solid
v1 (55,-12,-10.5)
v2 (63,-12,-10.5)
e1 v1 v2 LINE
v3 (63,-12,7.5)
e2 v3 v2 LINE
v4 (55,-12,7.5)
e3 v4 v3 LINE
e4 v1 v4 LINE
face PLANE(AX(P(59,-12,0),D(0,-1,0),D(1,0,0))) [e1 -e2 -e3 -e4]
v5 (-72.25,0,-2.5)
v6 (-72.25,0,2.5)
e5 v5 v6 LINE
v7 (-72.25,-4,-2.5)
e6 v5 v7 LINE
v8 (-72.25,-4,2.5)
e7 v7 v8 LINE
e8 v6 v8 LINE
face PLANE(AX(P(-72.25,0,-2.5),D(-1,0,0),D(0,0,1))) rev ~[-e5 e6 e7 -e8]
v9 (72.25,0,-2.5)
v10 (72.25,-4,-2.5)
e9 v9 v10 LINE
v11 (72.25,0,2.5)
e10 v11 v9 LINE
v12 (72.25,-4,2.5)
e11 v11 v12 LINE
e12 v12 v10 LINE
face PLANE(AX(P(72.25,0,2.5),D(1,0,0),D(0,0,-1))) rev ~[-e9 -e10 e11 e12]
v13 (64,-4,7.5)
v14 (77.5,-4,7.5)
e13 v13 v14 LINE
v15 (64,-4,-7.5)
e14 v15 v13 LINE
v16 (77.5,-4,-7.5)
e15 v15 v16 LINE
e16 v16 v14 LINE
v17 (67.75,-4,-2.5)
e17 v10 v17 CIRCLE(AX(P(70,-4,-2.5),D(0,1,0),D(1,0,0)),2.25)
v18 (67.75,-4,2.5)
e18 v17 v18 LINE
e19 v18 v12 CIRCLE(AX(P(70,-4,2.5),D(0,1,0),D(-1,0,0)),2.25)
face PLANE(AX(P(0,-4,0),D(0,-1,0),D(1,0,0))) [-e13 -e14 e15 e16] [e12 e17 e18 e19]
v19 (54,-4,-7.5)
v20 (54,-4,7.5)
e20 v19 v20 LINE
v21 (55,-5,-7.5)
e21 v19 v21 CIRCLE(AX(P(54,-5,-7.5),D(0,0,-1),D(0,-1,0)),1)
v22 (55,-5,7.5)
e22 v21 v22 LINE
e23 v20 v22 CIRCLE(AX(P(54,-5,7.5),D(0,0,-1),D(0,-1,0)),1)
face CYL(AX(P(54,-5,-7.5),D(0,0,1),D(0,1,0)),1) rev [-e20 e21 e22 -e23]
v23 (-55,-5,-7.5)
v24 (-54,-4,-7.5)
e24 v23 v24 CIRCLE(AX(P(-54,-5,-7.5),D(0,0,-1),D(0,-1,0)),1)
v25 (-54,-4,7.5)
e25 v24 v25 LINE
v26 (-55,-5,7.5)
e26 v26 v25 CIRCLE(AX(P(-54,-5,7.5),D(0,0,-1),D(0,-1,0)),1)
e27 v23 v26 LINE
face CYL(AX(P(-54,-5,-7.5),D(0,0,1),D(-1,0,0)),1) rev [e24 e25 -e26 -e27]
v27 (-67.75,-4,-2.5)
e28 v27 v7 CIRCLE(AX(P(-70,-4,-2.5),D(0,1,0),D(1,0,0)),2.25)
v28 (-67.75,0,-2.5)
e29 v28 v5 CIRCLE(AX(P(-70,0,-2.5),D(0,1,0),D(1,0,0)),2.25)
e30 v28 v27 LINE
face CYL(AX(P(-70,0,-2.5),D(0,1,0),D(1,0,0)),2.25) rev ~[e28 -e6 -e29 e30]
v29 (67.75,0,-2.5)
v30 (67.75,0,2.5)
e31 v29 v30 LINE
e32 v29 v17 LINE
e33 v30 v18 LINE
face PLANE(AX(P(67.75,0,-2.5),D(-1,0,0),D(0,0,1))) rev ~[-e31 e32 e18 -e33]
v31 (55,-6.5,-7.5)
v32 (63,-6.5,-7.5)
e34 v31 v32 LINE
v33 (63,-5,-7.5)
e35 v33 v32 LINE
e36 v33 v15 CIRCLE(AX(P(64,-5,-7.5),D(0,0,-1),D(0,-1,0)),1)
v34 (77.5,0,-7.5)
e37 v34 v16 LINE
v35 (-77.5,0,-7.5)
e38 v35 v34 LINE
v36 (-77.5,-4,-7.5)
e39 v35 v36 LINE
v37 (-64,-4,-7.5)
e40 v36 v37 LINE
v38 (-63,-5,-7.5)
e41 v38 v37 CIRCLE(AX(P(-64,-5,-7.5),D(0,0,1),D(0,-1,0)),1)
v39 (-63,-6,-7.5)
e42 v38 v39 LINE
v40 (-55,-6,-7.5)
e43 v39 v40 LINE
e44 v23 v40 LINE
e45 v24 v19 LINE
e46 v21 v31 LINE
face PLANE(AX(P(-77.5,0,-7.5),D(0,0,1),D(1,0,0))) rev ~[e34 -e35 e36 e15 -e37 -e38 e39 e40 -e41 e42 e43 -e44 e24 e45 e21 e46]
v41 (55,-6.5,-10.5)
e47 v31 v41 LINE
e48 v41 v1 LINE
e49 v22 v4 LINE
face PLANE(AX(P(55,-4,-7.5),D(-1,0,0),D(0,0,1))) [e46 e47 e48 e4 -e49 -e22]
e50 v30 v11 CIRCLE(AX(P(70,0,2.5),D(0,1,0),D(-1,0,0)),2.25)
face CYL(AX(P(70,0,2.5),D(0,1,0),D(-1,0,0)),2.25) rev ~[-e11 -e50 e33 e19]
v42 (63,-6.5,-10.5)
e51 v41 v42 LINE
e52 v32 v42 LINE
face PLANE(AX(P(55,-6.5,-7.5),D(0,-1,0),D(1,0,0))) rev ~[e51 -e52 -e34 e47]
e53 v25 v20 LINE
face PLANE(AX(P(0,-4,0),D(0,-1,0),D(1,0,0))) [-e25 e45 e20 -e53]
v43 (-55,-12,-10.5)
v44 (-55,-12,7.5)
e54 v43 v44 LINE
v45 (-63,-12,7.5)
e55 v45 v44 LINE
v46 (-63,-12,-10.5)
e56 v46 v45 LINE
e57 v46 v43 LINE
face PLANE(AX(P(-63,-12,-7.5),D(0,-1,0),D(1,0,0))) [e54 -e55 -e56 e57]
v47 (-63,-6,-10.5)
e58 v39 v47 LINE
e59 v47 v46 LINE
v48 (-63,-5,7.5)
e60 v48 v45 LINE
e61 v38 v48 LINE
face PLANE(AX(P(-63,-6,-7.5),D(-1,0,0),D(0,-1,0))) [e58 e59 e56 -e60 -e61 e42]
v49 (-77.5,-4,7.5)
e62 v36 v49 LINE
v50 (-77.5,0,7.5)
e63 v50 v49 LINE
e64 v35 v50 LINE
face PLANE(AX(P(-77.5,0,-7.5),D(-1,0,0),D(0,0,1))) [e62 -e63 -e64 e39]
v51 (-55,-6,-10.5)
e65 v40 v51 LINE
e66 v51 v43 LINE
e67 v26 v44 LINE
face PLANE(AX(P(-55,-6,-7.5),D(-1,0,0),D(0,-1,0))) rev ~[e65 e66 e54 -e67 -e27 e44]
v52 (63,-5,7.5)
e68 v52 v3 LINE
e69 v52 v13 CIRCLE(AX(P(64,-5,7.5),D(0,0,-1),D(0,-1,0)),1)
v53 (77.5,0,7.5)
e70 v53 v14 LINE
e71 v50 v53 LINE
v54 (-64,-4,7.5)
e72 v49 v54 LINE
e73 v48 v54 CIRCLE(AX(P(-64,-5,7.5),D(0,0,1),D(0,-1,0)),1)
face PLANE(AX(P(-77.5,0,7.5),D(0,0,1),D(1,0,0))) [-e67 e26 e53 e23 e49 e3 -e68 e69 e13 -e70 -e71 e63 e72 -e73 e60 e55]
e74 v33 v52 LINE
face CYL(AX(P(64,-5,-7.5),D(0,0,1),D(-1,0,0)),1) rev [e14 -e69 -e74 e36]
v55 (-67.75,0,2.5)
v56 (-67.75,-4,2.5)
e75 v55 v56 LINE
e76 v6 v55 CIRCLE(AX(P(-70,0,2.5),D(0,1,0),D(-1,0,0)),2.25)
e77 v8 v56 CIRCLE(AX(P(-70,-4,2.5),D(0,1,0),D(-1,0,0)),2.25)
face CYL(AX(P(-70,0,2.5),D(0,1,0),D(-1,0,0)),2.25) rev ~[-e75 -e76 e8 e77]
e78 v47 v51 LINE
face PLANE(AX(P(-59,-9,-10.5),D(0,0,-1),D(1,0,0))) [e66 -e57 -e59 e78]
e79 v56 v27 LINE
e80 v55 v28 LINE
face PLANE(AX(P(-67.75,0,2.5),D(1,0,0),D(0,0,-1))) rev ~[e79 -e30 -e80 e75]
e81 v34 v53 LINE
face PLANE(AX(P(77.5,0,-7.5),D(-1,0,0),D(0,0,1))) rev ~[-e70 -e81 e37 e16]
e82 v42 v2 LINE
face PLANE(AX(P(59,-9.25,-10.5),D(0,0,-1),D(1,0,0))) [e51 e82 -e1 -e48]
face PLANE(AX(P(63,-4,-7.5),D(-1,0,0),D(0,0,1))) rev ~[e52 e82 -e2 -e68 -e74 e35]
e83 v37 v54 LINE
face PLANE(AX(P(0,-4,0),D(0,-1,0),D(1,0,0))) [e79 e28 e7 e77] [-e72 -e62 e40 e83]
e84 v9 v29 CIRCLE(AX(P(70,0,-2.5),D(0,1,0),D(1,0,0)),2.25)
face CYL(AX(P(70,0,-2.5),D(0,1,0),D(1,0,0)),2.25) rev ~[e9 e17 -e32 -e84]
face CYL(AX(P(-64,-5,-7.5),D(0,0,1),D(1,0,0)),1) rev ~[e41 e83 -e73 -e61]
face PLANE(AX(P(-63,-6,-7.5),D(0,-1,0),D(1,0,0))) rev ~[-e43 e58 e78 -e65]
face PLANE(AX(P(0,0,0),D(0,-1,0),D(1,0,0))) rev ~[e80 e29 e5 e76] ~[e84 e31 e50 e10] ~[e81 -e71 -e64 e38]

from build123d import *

# Parameters (mm, degrees)
F0_W     = 155
F0_H     = 15
F1_DEPTH = 4
F2_W     = 8
F2_H     = 15
F3_DEPTH = 8
F4_W     = 8
F4_H     = 6
F4_H_2   = 5.5
F5_DEPTH = 3
F6_R     = 1


# Not quite as in the source:
# - a feature names something its author has since deleted; it is built from what else it names


with BuildPart() as f1:
    # F0 (on Front) → F1 (new body)
    with BuildSketch(Plane.XZ):
        Rectangle(F0_W, F0_H)
        with BuildLine():
            Line((-72.25, -2.5), (-72.25, 2.5))
            ThreePointArc((-72.25, 2.5), (-70, 4.75), (-67.75, 2.5))
            Line((-67.75, 2.5), (-67.75, -2.5))
            ThreePointArc((-67.75, -2.5), (-70, -4.75), (-72.25, -2.5))
        make_face(mode=Mode.SUBTRACT)
        with BuildLine():
            ThreePointArc((67.75, 2.5), (70, 4.75), (72.25, 2.5))
            Line((72.25, 2.5), (72.25, -2.5))
            ThreePointArc((72.25, -2.5), (70, -4.75), (67.75, -2.5))
            Line((67.75, -2.5), (67.75, 2.5))
        make_face(mode=Mode.SUBTRACT)
    extrude(amount=F1_DEPTH)

    # F2 (on face) → F3 (join)
    with BuildSketch(Plane.XZ.offset(4)):
        with Locations((-59, 0)):
            Rectangle(F2_W, F2_H)
        with Locations((59, 0)):
            Rectangle(F2_W, F2_H)
    extrude(amount=F3_DEPTH)

    # F4 (on face) → F5 (join)
    with BuildSketch(Plane(origin=(0, 0, -7.5), x_dir=(1, 0, 0), z_dir=(0, 0, -1))):
        with Locations((-59, 9)):
            Rectangle(F4_W, F4_H)
        with Locations((59, 9.25)):
            Rectangle(F4_W, F4_H_2)
    extrude(amount=F5_DEPTH)

    # F6
    f6_edges = [f1.edges().sort_by_distance(p)[0] for p in [
        (55, -4, 0),
        (-55, -4, 0),
        (63, -4, 0),
        (-63, -4, 0),
    ]]
    fillet(f6_edges, radius=F6_R)


solid = f1.part
